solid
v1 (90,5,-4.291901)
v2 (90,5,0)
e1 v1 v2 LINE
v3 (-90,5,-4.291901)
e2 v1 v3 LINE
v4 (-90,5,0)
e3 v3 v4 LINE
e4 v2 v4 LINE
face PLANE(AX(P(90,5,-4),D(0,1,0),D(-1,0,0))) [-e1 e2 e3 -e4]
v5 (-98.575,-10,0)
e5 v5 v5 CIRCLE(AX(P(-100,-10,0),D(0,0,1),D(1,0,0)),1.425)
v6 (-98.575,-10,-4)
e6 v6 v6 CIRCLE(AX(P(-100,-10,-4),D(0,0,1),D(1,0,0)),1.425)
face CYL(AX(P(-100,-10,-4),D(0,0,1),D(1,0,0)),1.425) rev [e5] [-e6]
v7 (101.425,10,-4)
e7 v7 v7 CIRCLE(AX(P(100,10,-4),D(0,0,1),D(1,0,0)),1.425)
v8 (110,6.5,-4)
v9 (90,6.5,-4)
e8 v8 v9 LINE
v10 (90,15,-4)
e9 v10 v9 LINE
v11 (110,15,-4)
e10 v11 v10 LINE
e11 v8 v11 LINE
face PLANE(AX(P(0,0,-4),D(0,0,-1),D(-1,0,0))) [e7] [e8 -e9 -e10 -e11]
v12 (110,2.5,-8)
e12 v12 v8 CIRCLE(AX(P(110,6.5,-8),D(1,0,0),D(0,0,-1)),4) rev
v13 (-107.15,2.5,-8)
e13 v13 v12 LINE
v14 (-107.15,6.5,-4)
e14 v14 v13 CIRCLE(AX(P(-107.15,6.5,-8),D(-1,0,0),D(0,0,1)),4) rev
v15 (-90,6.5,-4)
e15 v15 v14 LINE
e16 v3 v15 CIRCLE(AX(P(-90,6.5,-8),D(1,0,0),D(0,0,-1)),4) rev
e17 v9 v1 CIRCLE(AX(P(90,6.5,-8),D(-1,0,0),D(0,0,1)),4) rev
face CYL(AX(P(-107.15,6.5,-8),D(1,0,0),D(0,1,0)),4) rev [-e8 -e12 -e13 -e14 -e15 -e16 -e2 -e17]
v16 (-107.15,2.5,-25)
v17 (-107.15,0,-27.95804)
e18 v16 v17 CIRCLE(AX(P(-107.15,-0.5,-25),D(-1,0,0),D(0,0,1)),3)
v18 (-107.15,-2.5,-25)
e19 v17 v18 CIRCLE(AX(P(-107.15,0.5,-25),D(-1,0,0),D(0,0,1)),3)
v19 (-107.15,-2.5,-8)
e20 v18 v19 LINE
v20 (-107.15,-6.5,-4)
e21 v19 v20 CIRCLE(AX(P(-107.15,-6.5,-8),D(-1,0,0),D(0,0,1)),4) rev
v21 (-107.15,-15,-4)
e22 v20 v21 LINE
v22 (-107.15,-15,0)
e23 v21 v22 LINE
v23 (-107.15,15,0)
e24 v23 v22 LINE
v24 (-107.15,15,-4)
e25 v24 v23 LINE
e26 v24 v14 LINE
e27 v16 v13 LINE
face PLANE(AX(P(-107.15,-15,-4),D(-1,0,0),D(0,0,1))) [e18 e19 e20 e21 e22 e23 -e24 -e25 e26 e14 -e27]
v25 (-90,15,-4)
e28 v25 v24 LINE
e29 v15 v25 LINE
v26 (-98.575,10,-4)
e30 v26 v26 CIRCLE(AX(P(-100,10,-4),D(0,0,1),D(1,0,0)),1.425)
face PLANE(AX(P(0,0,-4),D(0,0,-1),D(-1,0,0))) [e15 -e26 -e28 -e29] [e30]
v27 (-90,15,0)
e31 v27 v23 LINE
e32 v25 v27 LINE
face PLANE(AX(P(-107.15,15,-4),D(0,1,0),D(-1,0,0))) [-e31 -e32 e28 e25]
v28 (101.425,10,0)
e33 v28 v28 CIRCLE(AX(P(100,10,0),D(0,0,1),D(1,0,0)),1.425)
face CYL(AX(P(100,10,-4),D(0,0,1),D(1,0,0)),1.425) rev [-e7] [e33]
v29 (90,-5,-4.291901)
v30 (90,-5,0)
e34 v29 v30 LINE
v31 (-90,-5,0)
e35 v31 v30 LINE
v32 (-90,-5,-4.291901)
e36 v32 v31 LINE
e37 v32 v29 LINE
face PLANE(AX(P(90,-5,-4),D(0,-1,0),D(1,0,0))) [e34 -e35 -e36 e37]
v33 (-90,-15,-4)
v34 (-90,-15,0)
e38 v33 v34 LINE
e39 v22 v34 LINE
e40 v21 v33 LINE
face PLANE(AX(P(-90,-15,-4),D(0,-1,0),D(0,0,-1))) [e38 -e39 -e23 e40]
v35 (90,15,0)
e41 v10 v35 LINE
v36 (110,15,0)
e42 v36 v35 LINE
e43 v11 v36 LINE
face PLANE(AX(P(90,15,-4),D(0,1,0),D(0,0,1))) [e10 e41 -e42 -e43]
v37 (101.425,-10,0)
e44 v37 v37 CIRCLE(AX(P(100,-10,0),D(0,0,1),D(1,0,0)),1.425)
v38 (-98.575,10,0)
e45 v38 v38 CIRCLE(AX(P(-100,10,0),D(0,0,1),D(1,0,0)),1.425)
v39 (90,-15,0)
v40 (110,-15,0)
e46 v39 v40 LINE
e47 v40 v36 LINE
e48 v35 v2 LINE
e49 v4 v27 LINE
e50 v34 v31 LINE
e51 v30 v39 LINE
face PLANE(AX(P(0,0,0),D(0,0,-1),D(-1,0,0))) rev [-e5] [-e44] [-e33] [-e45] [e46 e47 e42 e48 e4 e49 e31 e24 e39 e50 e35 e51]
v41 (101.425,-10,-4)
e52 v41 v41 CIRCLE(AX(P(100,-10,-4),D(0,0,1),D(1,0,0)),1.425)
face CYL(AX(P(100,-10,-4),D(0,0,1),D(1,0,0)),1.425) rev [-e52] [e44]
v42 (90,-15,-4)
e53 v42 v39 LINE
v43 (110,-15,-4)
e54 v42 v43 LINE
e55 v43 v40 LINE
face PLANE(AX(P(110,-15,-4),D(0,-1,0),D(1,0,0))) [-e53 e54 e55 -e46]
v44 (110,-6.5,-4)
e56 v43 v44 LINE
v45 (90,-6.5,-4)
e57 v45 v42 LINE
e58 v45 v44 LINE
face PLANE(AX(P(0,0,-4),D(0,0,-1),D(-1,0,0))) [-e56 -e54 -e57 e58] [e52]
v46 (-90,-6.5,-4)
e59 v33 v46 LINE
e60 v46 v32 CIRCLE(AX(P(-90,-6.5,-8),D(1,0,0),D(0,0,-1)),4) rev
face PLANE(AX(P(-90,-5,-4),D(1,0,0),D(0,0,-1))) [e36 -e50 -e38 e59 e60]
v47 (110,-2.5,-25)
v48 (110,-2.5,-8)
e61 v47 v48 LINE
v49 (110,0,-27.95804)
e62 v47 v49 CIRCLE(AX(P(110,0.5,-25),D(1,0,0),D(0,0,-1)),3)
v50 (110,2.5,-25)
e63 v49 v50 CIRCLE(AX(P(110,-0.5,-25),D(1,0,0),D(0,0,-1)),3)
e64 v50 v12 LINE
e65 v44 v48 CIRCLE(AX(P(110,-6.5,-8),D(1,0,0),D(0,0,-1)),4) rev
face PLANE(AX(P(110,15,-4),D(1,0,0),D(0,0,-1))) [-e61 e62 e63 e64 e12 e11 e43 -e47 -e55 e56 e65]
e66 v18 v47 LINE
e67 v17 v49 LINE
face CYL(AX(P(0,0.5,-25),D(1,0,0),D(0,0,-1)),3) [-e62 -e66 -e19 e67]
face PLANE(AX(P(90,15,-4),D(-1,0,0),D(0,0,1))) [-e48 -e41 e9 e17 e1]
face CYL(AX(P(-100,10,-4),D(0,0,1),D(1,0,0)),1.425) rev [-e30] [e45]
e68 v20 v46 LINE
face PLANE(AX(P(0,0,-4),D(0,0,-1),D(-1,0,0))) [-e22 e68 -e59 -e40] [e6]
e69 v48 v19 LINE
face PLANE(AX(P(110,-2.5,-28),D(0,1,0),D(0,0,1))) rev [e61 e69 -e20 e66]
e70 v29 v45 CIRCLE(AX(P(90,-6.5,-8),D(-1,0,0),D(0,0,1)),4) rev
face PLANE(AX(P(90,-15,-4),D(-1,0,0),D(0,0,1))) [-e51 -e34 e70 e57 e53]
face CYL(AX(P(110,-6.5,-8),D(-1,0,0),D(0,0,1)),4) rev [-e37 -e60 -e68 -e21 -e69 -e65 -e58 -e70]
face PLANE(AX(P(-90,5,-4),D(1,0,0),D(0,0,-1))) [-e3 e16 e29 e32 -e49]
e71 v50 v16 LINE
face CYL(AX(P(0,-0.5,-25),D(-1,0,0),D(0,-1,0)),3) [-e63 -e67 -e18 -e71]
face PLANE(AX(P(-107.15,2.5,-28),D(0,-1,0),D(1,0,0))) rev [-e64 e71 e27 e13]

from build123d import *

# Parameters (mm, degrees)
SKETCH1_R           = 1.425
BOSS_EXTRUDE1_DEPTH = 4
SKETCH2_W           = 217.15
SKETCH2_H           = 5
BOSS_EXTRUDE2_DEPTH = 24
FILLET1_R           = 4
FILLET2_R           = 3


with BuildPart() as part:
    # Sketch1 → Boss-Extrude1 (new body)
    with BuildSketch(Plane.XY):
        Polygon((110, -15), (90, -15), (90, -5), (-90, -5), (-90, -15), (-107.15, -15), (-107.15, 15), (-90, 15), (-90, 5), (90, 5), (90, 15), (110, 15), align=None)
        with Locations((100, 10)):
            Circle(SKETCH1_R, mode=Mode.SUBTRACT)
        with Locations((100, -10)):
            Circle(SKETCH1_R, mode=Mode.SUBTRACT)
        with Locations((-100, -10)):
            Circle(SKETCH1_R, mode=Mode.SUBTRACT)
        with Locations((-100, 10)):
            Circle(SKETCH1_R, mode=Mode.SUBTRACT)
    extrude(amount=-BOSS_EXTRUDE1_DEPTH)

    # Sketch2 → Boss-Extrude2 (add)
    with BuildSketch(Plane(origin=(0, 0, -4), x_dir=(-1, 0, 0), z_dir=(0, 0, -1))):
        with Locations((-1.425, 0)):
            Rectangle(SKETCH2_W, SKETCH2_H)
    extrude(amount=BOSS_EXTRUDE2_DEPTH)

    # Fillet1
    # the kernel refuses this fillet: 4 mm, written as the material it adds along each edge
    with BuildSketch(Plane(origin=(-107.15, 2.5, -4), x_dir=(0, 1, 0), z_dir=(1, 0, 0))) as fillet1_piece_1_section:
        with BuildLine():
            CenterArc((FILLET1_R, -FILLET1_R), FILLET1_R, 90, 90)
            Line((0, -FILLET1_R), (0, 0))
            Line((0, 0), (FILLET1_R, 0))
        make_face()
    fillet1_piece_1 = extrude(amount=217.15, mode=Mode.PRIVATE)
    fillet1_piece_1 = split(fillet1_piece_1, bisect_by=Plane(origin=(-98.575, 5, -4.029214959), z_dir=(0, 1, 0)), keep=Keep.TOP, mode=Mode.PRIVATE)
    fillet1_piece_1 = split(fillet1_piece_1, bisect_by=Plane(origin=(-90, 5.544093945, -4.029214959), z_dir=(-1, 0, 0)), keep=Keep.TOP, mode=Mode.PRIVATE)
    add(fillet1_piece_1)
    with BuildSketch(Plane(origin=(-107.15, 2.5, -4), x_dir=(0, 1, 0), z_dir=(1, 0, 0))) as fillet1_piece_2_section:
        with BuildLine():
            CenterArc((FILLET1_R, -FILLET1_R), FILLET1_R, 90, 90)
            Line((0, -FILLET1_R), (0, 0))
            Line((0, 0), (FILLET1_R, 0))
        make_face()
    fillet1_piece_2 = extrude(amount=217.15, mode=Mode.PRIVATE)
    fillet1_piece_2 = split(fillet1_piece_2, bisect_by=Plane(origin=(-98.575, 5, -4.966148005), z_dir=(0, -1, 0)), keep=Keep.TOP, mode=Mode.PRIVATE)
    fillet1_piece_2 = split(fillet1_piece_2, bisect_by=Plane(origin=(-90, 3.257783084, -4.966148005), z_dir=(-1, 0, 0)), keep=Keep.TOP, mode=Mode.PRIVATE)
    add(fillet1_piece_2)
    with BuildSketch(Plane(origin=(-107.15, 2.5, -4), x_dir=(0, 1, 0), z_dir=(1, 0, 0))) as fillet1_piece_3_section:
        with BuildLine():
            CenterArc((FILLET1_R, -FILLET1_R), FILLET1_R, 90, 90)
            Line((0, -FILLET1_R), (0, 0))
            Line((0, 0), (FILLET1_R, 0))
        make_face()
    fillet1_piece_3 = extrude(amount=217.15, mode=Mode.PRIVATE)
    fillet1_piece_3 = split(fillet1_piece_3, bisect_by=Plane(origin=(90, 3.257783084, -4.966148005), z_dir=(-1, 0, 0)), keep=Keep.TOP, mode=Mode.PRIVATE)
    fillet1_piece_3 = split(fillet1_piece_3, bisect_by=Plane(origin=(0, 5, -4.966148005), z_dir=(0, -1, 0)), keep=Keep.TOP, mode=Mode.PRIVATE)
    fillet1_piece_3 = split(fillet1_piece_3, bisect_by=Plane(origin=(-90, 3.257783084, -4.966148005), z_dir=(1, 0, 0)), keep=Keep.TOP, mode=Mode.PRIVATE)
    add(fillet1_piece_3)
    with BuildSketch(Plane(origin=(-107.15, 2.5, -4), x_dir=(0, 1, 0), z_dir=(1, 0, 0))) as fillet1_piece_4_section:
        with BuildLine():
            CenterArc((FILLET1_R, -FILLET1_R), FILLET1_R, 90, 90)
            Line((0, -FILLET1_R), (0, 0))
            Line((0, 0), (FILLET1_R, 0))
        make_face()
    fillet1_piece_4 = extrude(amount=217.15, mode=Mode.PRIVATE)
    fillet1_piece_4 = split(fillet1_piece_4, bisect_by=Plane(origin=(90, 5.544093945, -4.029214959), z_dir=(1, 0, 0)), keep=Keep.TOP, mode=Mode.PRIVATE)
    fillet1_piece_4 = split(fillet1_piece_4, bisect_by=Plane(origin=(100, 5, -4.029214959), z_dir=(0, 1, 0)), keep=Keep.TOP, mode=Mode.PRIVATE)
    add(fillet1_piece_4)
    with BuildSketch(Plane(origin=(-107.15, 2.5, -4), x_dir=(0, 1, 0), z_dir=(1, 0, 0))) as fillet1_piece_5_section:
        with BuildLine():
            CenterArc((FILLET1_R, -FILLET1_R), FILLET1_R, 90, 90)
            Line((0, -FILLET1_R), (0, 0))
            Line((0, 0), (FILLET1_R, 0))
        make_face()
    fillet1_piece_5 = extrude(amount=217.15, mode=Mode.PRIVATE)
    fillet1_piece_5 = split(fillet1_piece_5, bisect_by=Plane(origin=(90, 3.257783084, -4.966148005), z_dir=(1, 0, 0)), keep=Keep.TOP, mode=Mode.PRIVATE)
    fillet1_piece_5 = split(fillet1_piece_5, bisect_by=Plane(origin=(100, 5, -4.966148005), z_dir=(0, -1, 0)), keep=Keep.TOP, mode=Mode.PRIVATE)
    add(fillet1_piece_5)
    with BuildSketch(Plane(origin=(110, -2.5, -4), x_dir=(0, -1, 0), z_dir=(-1, 0, 0))) as fillet1_piece_6_section:
        with BuildLine():
            CenterArc((FILLET1_R, -FILLET1_R), FILLET1_R, 90, 90)
            Line((0, -FILLET1_R), (0, 0))
            Line((0, 0), (FILLET1_R, 0))
        make_face()
    fillet1_piece_6 = extrude(amount=217.15, mode=Mode.PRIVATE)
    fillet1_piece_6 = split(fillet1_piece_6, bisect_by=Plane(origin=(90, -5.544093945, -4.029214959), z_dir=(1, 0, 0)), keep=Keep.TOP, mode=Mode.PRIVATE)
    fillet1_piece_6 = split(fillet1_piece_6, bisect_by=Plane(origin=(100, -5, -4.029214959), z_dir=(0, -1, 0)), keep=Keep.TOP, mode=Mode.PRIVATE)
    add(fillet1_piece_6)
    with BuildSketch(Plane(origin=(110, -2.5, -4), x_dir=(0, -1, 0), z_dir=(-1, 0, 0))) as fillet1_piece_7_section:
        with BuildLine():
            CenterArc((FILLET1_R, -FILLET1_R), FILLET1_R, 90, 90)
            Line((0, -FILLET1_R), (0, 0))
            Line((0, 0), (FILLET1_R, 0))
        make_face()
    fillet1_piece_7 = extrude(amount=217.15, mode=Mode.PRIVATE)
    fillet1_piece_7 = split(fillet1_piece_7, bisect_by=Plane(origin=(90, -3.257783084, -4.966148005), z_dir=(1, 0, 0)), keep=Keep.TOP, mode=Mode.PRIVATE)
    fillet1_piece_7 = split(fillet1_piece_7, bisect_by=Plane(origin=(100, -5, -4.966148005), z_dir=(0, 1, 0)), keep=Keep.TOP, mode=Mode.PRIVATE)
    add(fillet1_piece_7)
    with BuildSketch(Plane(origin=(110, -2.5, -4), x_dir=(0, -1, 0), z_dir=(-1, 0, 0))) as fillet1_piece_8_section:
        with BuildLine():
            CenterArc((FILLET1_R, -FILLET1_R), FILLET1_R, 90, 90)
            Line((0, -FILLET1_R), (0, 0))
            Line((0, 0), (FILLET1_R, 0))
        make_face()
    fillet1_piece_8 = extrude(amount=217.15, mode=Mode.PRIVATE)
    fillet1_piece_8 = split(fillet1_piece_8, bisect_by=Plane(origin=(90, -3.257783084, -4.966148005), z_dir=(-1, 0, 0)), keep=Keep.TOP, mode=Mode.PRIVATE)
    fillet1_piece_8 = split(fillet1_piece_8, bisect_by=Plane(origin=(-90, -3.257783084, -4.966148005), z_dir=(1, 0, 0)), keep=Keep.TOP, mode=Mode.PRIVATE)
    fillet1_piece_8 = split(fillet1_piece_8, bisect_by=Plane(origin=(0, -5, -4.966148005), z_dir=(0, 1, 0)), keep=Keep.TOP, mode=Mode.PRIVATE)
    add(fillet1_piece_8)
    with BuildSketch(Plane(origin=(110, -2.5, -4), x_dir=(0, -1, 0), z_dir=(-1, 0, 0))) as fillet1_piece_9_section:
        with BuildLine():
            CenterArc((FILLET1_R, -FILLET1_R), FILLET1_R, 90, 90)
            Line((0, -FILLET1_R), (0, 0))
            Line((0, 0), (FILLET1_R, 0))
        make_face()
    fillet1_piece_9 = extrude(amount=217.15, mode=Mode.PRIVATE)
    fillet1_piece_9 = split(fillet1_piece_9, bisect_by=Plane(origin=(-90, -5.544093945, -4.029214959), z_dir=(-1, 0, 0)), keep=Keep.TOP, mode=Mode.PRIVATE)
    fillet1_piece_9 = split(fillet1_piece_9, bisect_by=Plane(origin=(-98.575, -5, -4.029214959), z_dir=(0, -1, 0)), keep=Keep.TOP, mode=Mode.PRIVATE)
    add(fillet1_piece_9)
    with BuildSketch(Plane(origin=(110, -2.5, -4), x_dir=(0, -1, 0), z_dir=(-1, 0, 0))) as fillet1_piece_10_section:
        with BuildLine():
            CenterArc((FILLET1_R, -FILLET1_R), FILLET1_R, 90, 90)
            Line((0, -FILLET1_R), (0, 0))
            Line((0, 0), (FILLET1_R, 0))
        make_face()
    fillet1_piece_10 = extrude(amount=217.15, mode=Mode.PRIVATE)
    fillet1_piece_10 = split(fillet1_piece_10, bisect_by=Plane(origin=(-90, -3.257783084, -4.966148005), z_dir=(-1, 0, 0)), keep=Keep.TOP, mode=Mode.PRIVATE)
    fillet1_piece_10 = split(fillet1_piece_10, bisect_by=Plane(origin=(-98.575, -5, -4.966148005), z_dir=(0, 1, 0)), keep=Keep.TOP, mode=Mode.PRIVATE)
    add(fillet1_piece_10)

    # Fillet2
    # the kernel refuses this fillet: 3 mm, written as the material it takes off along each edge
    with BuildSketch(Plane(origin=(117.5, -2.5, -28), x_dir=(0, 1, 0), z_dir=(-1, 0, 0))) as fillet2_piece_1:
        with BuildLine():
            CenterArc((FILLET2_R, -FILLET2_R), FILLET2_R, 90, 90)
            Line((0, -FILLET2_R), (0, 0))
            Line((0, 0), (FILLET2_R, 0))
        make_face()
    extrude(amount=232.15, mode=Mode.SUBTRACT)
    with BuildSketch(Plane(origin=(-114.65, 2.5, -28), x_dir=(0, 0, 1), z_dir=(1, 0, 0))) as fillet2_piece_2:
        with BuildLine():
            CenterArc((FILLET2_R, FILLET2_R), FILLET2_R, 180, 90)
            Line((0, FILLET2_R), (0, 0))
            Line((0, 0), (FILLET2_R, 0))
        make_face()
    extrude(amount=232.15, mode=Mode.SUBTRACT)


solid = part.part
